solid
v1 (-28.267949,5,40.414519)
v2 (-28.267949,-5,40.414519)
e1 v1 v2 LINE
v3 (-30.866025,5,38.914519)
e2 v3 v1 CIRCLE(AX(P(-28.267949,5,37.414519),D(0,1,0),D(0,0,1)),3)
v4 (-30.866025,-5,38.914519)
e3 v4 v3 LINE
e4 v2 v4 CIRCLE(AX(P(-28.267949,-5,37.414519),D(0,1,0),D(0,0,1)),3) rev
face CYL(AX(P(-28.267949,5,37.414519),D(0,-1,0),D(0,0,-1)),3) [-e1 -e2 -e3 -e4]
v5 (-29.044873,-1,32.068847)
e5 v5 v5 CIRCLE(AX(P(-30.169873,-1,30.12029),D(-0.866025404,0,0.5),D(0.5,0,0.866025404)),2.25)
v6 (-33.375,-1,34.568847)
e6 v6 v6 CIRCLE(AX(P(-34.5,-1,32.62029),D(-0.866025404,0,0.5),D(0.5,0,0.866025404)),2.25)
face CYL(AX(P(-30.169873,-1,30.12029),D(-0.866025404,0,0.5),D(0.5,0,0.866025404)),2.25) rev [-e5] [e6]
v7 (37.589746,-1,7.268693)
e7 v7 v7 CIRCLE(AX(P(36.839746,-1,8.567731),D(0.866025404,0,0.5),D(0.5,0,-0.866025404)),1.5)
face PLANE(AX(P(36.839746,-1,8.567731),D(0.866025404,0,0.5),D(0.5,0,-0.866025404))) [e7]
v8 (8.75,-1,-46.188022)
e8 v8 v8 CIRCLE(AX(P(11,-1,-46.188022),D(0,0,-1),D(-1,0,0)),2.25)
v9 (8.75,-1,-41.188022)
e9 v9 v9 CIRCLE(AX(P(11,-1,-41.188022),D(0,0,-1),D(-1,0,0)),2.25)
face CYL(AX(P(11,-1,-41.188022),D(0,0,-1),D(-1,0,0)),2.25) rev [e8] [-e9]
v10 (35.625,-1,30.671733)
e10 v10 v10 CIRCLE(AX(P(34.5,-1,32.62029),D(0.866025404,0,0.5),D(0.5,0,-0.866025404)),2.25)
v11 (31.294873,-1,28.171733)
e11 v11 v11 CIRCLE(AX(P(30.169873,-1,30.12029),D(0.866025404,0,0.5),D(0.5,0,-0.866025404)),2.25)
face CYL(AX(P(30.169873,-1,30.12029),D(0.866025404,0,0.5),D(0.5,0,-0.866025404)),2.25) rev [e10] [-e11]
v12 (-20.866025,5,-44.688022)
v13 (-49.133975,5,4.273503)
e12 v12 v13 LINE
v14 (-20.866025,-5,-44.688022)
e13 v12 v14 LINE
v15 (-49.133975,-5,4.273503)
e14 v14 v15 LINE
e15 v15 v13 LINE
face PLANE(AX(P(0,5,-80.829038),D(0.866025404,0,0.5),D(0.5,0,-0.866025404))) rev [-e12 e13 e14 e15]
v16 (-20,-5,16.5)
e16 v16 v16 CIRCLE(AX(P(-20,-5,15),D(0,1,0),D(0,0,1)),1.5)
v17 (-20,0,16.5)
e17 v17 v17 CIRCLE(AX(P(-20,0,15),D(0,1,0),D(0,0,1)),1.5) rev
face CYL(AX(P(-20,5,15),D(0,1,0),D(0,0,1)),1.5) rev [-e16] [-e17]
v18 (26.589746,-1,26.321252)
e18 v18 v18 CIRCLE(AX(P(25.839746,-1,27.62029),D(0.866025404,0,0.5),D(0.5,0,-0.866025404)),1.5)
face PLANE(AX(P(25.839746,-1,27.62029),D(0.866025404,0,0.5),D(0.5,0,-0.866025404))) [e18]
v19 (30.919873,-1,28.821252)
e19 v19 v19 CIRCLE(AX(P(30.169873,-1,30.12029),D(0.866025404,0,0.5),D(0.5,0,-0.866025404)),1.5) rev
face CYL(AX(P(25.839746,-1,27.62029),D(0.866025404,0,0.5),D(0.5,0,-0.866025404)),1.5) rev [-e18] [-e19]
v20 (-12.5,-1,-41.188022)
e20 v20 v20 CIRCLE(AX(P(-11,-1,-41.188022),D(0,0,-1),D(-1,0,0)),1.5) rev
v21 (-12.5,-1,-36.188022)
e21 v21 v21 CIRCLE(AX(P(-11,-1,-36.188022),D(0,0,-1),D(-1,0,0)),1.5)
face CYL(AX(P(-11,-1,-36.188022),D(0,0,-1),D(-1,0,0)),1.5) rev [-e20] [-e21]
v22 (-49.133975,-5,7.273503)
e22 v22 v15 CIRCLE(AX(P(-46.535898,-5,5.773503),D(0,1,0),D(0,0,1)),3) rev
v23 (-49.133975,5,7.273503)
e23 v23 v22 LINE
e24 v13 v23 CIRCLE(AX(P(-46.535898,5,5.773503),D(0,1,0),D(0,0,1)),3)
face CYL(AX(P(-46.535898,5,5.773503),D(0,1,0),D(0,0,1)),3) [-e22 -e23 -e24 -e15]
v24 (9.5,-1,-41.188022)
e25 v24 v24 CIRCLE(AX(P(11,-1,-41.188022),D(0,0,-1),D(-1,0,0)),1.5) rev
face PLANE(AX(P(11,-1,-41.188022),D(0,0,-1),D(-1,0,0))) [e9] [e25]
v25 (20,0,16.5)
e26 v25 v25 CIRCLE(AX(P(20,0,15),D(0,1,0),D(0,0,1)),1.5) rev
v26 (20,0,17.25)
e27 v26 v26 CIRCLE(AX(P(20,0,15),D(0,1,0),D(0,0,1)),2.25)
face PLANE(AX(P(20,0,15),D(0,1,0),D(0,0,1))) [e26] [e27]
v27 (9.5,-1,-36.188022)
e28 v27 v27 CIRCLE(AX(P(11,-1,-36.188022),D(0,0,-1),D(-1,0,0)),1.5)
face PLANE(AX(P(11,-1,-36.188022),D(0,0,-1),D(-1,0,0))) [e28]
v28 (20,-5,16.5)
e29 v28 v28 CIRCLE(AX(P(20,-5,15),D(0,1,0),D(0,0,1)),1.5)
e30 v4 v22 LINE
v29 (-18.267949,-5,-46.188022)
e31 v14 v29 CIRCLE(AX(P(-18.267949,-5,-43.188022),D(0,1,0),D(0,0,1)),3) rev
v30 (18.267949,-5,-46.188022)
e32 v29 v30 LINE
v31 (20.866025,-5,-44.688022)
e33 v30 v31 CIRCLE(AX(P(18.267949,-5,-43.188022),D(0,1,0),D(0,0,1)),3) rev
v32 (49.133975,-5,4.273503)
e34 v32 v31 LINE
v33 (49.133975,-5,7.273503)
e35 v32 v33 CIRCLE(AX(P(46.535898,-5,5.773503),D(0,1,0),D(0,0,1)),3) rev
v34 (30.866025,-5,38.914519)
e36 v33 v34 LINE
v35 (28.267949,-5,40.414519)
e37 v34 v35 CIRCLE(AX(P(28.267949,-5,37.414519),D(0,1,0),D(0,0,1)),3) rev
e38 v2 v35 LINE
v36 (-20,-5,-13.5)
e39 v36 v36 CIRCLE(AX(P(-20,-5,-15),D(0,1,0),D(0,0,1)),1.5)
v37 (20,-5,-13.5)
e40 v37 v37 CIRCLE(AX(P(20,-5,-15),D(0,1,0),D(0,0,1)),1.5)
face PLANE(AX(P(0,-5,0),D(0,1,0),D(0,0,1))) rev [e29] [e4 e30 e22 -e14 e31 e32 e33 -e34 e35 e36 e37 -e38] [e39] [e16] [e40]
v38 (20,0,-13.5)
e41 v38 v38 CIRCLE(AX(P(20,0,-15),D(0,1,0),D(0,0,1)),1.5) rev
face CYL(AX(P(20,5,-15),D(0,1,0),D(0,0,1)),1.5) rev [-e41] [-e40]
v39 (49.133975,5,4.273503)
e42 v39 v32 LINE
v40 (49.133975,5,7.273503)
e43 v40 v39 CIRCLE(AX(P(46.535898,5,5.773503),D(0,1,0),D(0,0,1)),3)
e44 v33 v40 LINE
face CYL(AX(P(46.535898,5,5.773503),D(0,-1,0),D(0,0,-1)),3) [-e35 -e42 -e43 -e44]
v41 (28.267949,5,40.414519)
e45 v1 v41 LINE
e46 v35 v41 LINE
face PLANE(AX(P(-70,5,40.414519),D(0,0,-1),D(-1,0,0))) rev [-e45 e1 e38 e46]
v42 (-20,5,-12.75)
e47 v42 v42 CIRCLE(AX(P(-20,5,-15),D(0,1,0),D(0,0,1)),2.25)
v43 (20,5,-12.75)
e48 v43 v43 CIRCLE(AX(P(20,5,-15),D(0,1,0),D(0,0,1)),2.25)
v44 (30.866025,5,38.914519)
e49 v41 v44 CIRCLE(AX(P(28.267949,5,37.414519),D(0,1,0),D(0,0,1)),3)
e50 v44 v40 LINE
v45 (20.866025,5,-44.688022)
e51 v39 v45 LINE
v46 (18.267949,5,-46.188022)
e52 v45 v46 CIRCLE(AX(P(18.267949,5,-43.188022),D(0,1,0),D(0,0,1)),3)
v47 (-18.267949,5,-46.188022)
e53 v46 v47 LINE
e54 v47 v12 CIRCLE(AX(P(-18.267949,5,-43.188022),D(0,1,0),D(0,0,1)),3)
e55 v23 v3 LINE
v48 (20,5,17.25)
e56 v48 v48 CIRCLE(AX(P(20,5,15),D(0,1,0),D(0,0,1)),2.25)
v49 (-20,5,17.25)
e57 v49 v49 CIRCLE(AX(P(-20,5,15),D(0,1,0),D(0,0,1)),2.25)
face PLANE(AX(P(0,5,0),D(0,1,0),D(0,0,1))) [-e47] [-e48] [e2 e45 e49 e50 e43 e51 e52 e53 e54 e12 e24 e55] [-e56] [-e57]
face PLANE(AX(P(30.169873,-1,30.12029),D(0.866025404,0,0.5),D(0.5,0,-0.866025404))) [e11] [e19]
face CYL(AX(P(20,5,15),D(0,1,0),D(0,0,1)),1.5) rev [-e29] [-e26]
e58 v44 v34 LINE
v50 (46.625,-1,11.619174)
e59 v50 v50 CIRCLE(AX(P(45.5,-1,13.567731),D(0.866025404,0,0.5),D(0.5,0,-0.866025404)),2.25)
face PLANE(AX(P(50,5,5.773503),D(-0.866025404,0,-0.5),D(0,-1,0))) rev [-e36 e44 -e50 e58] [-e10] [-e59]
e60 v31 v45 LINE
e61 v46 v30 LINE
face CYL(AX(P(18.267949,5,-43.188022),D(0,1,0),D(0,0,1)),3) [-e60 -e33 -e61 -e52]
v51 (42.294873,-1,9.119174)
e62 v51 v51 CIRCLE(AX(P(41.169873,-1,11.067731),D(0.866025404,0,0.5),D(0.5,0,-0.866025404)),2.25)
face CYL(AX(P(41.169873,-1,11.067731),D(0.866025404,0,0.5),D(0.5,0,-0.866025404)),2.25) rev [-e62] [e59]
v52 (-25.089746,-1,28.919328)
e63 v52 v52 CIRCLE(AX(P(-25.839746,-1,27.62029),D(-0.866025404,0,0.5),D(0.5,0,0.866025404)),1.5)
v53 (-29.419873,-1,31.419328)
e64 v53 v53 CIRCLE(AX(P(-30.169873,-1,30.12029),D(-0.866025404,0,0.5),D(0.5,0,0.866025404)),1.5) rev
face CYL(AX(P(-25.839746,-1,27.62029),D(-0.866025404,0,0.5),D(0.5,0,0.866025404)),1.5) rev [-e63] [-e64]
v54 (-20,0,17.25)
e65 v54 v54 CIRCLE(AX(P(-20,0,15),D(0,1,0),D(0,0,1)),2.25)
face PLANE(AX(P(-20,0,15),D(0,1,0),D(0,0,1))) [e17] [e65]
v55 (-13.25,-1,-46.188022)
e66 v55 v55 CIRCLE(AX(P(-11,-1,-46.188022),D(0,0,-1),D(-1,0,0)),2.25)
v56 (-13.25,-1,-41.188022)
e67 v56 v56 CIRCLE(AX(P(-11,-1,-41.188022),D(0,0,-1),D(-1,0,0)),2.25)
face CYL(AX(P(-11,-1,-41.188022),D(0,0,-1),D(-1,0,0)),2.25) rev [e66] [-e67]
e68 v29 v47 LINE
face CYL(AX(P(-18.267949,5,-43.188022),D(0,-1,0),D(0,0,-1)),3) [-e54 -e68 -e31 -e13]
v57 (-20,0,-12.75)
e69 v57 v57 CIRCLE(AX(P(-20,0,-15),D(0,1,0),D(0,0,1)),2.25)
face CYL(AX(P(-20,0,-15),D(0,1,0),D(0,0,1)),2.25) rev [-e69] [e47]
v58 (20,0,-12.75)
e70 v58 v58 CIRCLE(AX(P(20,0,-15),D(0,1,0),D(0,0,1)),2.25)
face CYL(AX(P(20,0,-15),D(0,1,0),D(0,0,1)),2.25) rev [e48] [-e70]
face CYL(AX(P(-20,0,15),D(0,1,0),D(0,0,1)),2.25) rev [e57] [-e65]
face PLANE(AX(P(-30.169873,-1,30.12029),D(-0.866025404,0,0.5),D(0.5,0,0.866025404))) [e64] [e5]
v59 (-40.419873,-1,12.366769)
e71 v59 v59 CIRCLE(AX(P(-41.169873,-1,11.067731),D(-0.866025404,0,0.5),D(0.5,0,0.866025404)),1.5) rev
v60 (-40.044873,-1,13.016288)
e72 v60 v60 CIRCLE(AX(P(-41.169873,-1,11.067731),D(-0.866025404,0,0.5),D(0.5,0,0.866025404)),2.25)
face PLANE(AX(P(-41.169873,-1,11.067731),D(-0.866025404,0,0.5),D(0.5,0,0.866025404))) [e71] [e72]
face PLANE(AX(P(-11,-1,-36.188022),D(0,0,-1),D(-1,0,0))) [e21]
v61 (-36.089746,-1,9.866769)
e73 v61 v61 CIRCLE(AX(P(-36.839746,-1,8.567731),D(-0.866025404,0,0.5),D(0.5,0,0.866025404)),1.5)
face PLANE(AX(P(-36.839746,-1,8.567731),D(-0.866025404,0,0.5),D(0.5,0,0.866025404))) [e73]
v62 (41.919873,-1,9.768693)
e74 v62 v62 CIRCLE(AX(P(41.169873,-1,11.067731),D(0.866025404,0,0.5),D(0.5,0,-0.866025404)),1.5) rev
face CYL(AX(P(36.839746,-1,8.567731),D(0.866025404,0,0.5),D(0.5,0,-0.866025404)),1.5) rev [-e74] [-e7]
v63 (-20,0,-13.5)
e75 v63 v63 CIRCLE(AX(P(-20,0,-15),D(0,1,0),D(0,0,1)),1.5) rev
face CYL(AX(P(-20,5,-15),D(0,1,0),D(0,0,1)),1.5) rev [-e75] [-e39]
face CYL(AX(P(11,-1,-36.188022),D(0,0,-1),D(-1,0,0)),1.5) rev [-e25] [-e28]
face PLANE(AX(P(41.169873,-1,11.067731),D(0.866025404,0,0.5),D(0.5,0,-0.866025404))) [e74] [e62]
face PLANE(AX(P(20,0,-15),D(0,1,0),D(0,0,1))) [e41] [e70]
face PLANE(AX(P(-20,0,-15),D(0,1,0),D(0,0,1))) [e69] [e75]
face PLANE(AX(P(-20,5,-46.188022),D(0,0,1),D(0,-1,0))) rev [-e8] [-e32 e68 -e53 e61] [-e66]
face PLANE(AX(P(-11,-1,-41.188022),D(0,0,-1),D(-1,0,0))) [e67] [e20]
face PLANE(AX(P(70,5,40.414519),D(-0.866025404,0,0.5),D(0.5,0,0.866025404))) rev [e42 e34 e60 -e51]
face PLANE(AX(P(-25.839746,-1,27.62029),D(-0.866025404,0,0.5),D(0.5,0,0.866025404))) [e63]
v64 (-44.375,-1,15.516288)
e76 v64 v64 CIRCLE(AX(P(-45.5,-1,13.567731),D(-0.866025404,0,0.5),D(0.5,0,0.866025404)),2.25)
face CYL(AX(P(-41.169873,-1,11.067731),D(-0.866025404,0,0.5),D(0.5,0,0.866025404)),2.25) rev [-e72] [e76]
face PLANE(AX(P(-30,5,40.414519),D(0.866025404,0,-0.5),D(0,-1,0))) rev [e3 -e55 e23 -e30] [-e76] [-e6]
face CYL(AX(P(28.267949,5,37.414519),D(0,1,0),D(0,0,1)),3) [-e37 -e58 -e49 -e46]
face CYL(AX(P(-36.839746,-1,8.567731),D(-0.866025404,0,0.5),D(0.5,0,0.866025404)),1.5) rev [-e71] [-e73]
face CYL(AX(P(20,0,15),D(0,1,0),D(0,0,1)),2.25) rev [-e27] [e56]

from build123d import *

# Parameters (mm, degrees)
BOSS_EXTRUDE1_DEPTH     = 5
CHAMFER1_SIZE           = 40
SKETCH4_R               = 1.5
CUT_EXTRUDE1_DEPTH      = 10
SKETCH10_R              = 2.25
CUT_EXTRUDE3_DEPTH      = 5
CRVPATTERN1_START       = -46.188021535
CRVPATTERN1_OUTLINE_R   = 2.25
CRVPATTERN1_DEPTH       = 5
CRVPATTERN1_START_2     = -41.188021535
CRVPATTERN1_2_OUTLINE_R = 1.5
CRVPATTERN1_2_DEPTH     = 5
CRVPATTERN1_3_OUTLINE_R = 2.25
CRVPATTERN1_3_DEPTH     = 5
CRVPATTERN1_4_OUTLINE_R = 1.5
CRVPATTERN1_4_DEPTH     = 5
F_3_0MM_DOWEL_HOLE1_D   = 3
SKETCH9_R               = 2.25
CUT_EXTRUDE2_DEPTH      = 5
FILLET1_R               = 3


# Read off the part's stored shape, not the designer's step: CrvPattern1
with BuildPart() as part:
    # Sketch2 → Boss-Extrude1 (new, symmetric)
    with BuildSketch(Plane(origin=(0, 0, 0), x_dir=(1, 0, 0), z_dir=(0, 1, 0))):
        Polygon((70, -40.414518843), (0, 80.829037687), (-70, -40.414518843), align=None)
    extrude(amount=BOSS_EXTRUDE1_DEPTH, both=True)

    # Chamfer1
    chamfer1_edges = [part.edges().sort_by_distance(p)[0] for p in [
        (-70, 0, 40.414518843),
        (0, 0, -80.829037687),
        (70, 0, 40.414518843),
    ]]
    chamfer(chamfer1_edges, length=CHAMFER1_SIZE)

    # Sketch4 → Cut-Extrude1 (cut)
    with BuildSketch(Plane(origin=(40, 0, 23.094010768), x_dir=(0.5000000000000004, 0, -0.8660254037844384), z_dir=(0.8660254037844384, 0, 0.5000000000000004))):
        with Locations((-11, -1)):
            Circle(SKETCH4_R)
        with Locations((11, -1)):
            Circle(SKETCH4_R)
    extrude(amount=-CUT_EXTRUDE1_DEPTH, mode=Mode.SUBTRACT)

    # Sketch10 → Cut-Extrude3 (cut)
    with BuildSketch(Plane(origin=(40, 0, 23.094010768), x_dir=(0.4999999999999997, 0, -0.8660254037844388), z_dir=(0.8660254037844389, 0, 0.49999999999999983))):
        with Locations((-11, -1)):
            Circle(SKETCH10_R)
        with Locations((11, -1)):
            Circle(SKETCH10_R)
    extrude(amount=-CUT_EXTRUDE3_DEPTH, mode=Mode.SUBTRACT)

    # CrvPattern1 outline → CrvPattern1 (cut)
    with BuildSketch(Plane.XY.offset(CRVPATTERN1_START)):
        with Locations((11, -1)):
            Circle(CRVPATTERN1_OUTLINE_R)
        with Locations((-11, -1)):
            Circle(CRVPATTERN1_OUTLINE_R)
    extrude(amount=CRVPATTERN1_DEPTH, mode=Mode.SUBTRACT)

    # CrvPattern1 2 outline → CrvPattern1 2 (cut)
    with BuildSketch(Plane.XY.offset(CRVPATTERN1_START_2)):
        with Locations((11, -1)):
            Circle(CRVPATTERN1_2_OUTLINE_R)
        with Locations((-11, -1)):
            Circle(CRVPATTERN1_2_OUTLINE_R)
    extrude(amount=CRVPATTERN1_2_DEPTH, mode=Mode.SUBTRACT)

    # CrvPattern1 3 outline → CrvPattern1 3 (cut)
    with BuildSketch(Plane(origin=(0, 0, 0), x_dir=(0.500000000000013, 0, 0.8660254037844313), z_dir=(0.8660254037844312, 0, -0.5000000000000131)).offset(CRVPATTERN1_START)):
        with Locations((-11, 1)):
            Circle(CRVPATTERN1_3_OUTLINE_R)
        with Locations((11, 1)):
            Circle(CRVPATTERN1_3_OUTLINE_R)
    extrude(amount=CRVPATTERN1_3_DEPTH, mode=Mode.SUBTRACT)

    # CrvPattern1 4 outline → CrvPattern1 4 (cut)
    with BuildSketch(Plane(origin=(0, 0, 0), x_dir=(0.500000000000013, 0, 0.8660254037844313), z_dir=(0.8660254037844312, 0, -0.5000000000000131)).offset(CRVPATTERN1_START_2)):
        with Locations((-11, 1)):
            Circle(CRVPATTERN1_4_OUTLINE_R)
        with Locations((11, 1)):
            Circle(CRVPATTERN1_4_OUTLINE_R)
    extrude(amount=CRVPATTERN1_4_DEPTH, mode=Mode.SUBTRACT)

    # Ø3.0mm Dowel Hole1 (through all)
    with Locations(Plane(origin=(0, 5, 0), x_dir=(1, 0, 0), z_dir=(0, 1, 0))):
        with Locations((-20, 15), (20, 15), (20, -15), (-20, -15)):
            Hole(F_3_0MM_DOWEL_HOLE1_D / 2)

    # Sketch9 → Cut-Extrude2 (cut)
    with BuildSketch(Plane(origin=(0, 5, 0), x_dir=(1, 0, 0), z_dir=(0, 1, 0))):
        with Locations(Location((-20, 15, 0), (0, 0, 270))):
            Circle(SKETCH9_R)
        with Locations(Location((20, 15, 0), (0, 0, 270))):
            Circle(SKETCH9_R)
        with Locations(Location((20, -15, 0), (0, 0, 270))):
            Circle(SKETCH9_R)
        with Locations(Location((-20, -15, 0), (0, 0, 270))):
            Circle(SKETCH9_R)
    extrude(amount=-CUT_EXTRUDE2_DEPTH, mode=Mode.SUBTRACT)

    # Fillet1
    fillet1_edges = [part.edges().sort_by_distance(p)[0] for p in [
        (20, 0, -46.188021535),
        (50, 0, 5.773502692),
        (-30, 0, 40.414518843),
        (30, 0, 40.414518843),
        (-50, 0, 5.773502692),
        (-20, 0, -46.188021535),
    ]]
    fillet(fillet1_edges, radius=FILLET1_R)


solid = part.part
